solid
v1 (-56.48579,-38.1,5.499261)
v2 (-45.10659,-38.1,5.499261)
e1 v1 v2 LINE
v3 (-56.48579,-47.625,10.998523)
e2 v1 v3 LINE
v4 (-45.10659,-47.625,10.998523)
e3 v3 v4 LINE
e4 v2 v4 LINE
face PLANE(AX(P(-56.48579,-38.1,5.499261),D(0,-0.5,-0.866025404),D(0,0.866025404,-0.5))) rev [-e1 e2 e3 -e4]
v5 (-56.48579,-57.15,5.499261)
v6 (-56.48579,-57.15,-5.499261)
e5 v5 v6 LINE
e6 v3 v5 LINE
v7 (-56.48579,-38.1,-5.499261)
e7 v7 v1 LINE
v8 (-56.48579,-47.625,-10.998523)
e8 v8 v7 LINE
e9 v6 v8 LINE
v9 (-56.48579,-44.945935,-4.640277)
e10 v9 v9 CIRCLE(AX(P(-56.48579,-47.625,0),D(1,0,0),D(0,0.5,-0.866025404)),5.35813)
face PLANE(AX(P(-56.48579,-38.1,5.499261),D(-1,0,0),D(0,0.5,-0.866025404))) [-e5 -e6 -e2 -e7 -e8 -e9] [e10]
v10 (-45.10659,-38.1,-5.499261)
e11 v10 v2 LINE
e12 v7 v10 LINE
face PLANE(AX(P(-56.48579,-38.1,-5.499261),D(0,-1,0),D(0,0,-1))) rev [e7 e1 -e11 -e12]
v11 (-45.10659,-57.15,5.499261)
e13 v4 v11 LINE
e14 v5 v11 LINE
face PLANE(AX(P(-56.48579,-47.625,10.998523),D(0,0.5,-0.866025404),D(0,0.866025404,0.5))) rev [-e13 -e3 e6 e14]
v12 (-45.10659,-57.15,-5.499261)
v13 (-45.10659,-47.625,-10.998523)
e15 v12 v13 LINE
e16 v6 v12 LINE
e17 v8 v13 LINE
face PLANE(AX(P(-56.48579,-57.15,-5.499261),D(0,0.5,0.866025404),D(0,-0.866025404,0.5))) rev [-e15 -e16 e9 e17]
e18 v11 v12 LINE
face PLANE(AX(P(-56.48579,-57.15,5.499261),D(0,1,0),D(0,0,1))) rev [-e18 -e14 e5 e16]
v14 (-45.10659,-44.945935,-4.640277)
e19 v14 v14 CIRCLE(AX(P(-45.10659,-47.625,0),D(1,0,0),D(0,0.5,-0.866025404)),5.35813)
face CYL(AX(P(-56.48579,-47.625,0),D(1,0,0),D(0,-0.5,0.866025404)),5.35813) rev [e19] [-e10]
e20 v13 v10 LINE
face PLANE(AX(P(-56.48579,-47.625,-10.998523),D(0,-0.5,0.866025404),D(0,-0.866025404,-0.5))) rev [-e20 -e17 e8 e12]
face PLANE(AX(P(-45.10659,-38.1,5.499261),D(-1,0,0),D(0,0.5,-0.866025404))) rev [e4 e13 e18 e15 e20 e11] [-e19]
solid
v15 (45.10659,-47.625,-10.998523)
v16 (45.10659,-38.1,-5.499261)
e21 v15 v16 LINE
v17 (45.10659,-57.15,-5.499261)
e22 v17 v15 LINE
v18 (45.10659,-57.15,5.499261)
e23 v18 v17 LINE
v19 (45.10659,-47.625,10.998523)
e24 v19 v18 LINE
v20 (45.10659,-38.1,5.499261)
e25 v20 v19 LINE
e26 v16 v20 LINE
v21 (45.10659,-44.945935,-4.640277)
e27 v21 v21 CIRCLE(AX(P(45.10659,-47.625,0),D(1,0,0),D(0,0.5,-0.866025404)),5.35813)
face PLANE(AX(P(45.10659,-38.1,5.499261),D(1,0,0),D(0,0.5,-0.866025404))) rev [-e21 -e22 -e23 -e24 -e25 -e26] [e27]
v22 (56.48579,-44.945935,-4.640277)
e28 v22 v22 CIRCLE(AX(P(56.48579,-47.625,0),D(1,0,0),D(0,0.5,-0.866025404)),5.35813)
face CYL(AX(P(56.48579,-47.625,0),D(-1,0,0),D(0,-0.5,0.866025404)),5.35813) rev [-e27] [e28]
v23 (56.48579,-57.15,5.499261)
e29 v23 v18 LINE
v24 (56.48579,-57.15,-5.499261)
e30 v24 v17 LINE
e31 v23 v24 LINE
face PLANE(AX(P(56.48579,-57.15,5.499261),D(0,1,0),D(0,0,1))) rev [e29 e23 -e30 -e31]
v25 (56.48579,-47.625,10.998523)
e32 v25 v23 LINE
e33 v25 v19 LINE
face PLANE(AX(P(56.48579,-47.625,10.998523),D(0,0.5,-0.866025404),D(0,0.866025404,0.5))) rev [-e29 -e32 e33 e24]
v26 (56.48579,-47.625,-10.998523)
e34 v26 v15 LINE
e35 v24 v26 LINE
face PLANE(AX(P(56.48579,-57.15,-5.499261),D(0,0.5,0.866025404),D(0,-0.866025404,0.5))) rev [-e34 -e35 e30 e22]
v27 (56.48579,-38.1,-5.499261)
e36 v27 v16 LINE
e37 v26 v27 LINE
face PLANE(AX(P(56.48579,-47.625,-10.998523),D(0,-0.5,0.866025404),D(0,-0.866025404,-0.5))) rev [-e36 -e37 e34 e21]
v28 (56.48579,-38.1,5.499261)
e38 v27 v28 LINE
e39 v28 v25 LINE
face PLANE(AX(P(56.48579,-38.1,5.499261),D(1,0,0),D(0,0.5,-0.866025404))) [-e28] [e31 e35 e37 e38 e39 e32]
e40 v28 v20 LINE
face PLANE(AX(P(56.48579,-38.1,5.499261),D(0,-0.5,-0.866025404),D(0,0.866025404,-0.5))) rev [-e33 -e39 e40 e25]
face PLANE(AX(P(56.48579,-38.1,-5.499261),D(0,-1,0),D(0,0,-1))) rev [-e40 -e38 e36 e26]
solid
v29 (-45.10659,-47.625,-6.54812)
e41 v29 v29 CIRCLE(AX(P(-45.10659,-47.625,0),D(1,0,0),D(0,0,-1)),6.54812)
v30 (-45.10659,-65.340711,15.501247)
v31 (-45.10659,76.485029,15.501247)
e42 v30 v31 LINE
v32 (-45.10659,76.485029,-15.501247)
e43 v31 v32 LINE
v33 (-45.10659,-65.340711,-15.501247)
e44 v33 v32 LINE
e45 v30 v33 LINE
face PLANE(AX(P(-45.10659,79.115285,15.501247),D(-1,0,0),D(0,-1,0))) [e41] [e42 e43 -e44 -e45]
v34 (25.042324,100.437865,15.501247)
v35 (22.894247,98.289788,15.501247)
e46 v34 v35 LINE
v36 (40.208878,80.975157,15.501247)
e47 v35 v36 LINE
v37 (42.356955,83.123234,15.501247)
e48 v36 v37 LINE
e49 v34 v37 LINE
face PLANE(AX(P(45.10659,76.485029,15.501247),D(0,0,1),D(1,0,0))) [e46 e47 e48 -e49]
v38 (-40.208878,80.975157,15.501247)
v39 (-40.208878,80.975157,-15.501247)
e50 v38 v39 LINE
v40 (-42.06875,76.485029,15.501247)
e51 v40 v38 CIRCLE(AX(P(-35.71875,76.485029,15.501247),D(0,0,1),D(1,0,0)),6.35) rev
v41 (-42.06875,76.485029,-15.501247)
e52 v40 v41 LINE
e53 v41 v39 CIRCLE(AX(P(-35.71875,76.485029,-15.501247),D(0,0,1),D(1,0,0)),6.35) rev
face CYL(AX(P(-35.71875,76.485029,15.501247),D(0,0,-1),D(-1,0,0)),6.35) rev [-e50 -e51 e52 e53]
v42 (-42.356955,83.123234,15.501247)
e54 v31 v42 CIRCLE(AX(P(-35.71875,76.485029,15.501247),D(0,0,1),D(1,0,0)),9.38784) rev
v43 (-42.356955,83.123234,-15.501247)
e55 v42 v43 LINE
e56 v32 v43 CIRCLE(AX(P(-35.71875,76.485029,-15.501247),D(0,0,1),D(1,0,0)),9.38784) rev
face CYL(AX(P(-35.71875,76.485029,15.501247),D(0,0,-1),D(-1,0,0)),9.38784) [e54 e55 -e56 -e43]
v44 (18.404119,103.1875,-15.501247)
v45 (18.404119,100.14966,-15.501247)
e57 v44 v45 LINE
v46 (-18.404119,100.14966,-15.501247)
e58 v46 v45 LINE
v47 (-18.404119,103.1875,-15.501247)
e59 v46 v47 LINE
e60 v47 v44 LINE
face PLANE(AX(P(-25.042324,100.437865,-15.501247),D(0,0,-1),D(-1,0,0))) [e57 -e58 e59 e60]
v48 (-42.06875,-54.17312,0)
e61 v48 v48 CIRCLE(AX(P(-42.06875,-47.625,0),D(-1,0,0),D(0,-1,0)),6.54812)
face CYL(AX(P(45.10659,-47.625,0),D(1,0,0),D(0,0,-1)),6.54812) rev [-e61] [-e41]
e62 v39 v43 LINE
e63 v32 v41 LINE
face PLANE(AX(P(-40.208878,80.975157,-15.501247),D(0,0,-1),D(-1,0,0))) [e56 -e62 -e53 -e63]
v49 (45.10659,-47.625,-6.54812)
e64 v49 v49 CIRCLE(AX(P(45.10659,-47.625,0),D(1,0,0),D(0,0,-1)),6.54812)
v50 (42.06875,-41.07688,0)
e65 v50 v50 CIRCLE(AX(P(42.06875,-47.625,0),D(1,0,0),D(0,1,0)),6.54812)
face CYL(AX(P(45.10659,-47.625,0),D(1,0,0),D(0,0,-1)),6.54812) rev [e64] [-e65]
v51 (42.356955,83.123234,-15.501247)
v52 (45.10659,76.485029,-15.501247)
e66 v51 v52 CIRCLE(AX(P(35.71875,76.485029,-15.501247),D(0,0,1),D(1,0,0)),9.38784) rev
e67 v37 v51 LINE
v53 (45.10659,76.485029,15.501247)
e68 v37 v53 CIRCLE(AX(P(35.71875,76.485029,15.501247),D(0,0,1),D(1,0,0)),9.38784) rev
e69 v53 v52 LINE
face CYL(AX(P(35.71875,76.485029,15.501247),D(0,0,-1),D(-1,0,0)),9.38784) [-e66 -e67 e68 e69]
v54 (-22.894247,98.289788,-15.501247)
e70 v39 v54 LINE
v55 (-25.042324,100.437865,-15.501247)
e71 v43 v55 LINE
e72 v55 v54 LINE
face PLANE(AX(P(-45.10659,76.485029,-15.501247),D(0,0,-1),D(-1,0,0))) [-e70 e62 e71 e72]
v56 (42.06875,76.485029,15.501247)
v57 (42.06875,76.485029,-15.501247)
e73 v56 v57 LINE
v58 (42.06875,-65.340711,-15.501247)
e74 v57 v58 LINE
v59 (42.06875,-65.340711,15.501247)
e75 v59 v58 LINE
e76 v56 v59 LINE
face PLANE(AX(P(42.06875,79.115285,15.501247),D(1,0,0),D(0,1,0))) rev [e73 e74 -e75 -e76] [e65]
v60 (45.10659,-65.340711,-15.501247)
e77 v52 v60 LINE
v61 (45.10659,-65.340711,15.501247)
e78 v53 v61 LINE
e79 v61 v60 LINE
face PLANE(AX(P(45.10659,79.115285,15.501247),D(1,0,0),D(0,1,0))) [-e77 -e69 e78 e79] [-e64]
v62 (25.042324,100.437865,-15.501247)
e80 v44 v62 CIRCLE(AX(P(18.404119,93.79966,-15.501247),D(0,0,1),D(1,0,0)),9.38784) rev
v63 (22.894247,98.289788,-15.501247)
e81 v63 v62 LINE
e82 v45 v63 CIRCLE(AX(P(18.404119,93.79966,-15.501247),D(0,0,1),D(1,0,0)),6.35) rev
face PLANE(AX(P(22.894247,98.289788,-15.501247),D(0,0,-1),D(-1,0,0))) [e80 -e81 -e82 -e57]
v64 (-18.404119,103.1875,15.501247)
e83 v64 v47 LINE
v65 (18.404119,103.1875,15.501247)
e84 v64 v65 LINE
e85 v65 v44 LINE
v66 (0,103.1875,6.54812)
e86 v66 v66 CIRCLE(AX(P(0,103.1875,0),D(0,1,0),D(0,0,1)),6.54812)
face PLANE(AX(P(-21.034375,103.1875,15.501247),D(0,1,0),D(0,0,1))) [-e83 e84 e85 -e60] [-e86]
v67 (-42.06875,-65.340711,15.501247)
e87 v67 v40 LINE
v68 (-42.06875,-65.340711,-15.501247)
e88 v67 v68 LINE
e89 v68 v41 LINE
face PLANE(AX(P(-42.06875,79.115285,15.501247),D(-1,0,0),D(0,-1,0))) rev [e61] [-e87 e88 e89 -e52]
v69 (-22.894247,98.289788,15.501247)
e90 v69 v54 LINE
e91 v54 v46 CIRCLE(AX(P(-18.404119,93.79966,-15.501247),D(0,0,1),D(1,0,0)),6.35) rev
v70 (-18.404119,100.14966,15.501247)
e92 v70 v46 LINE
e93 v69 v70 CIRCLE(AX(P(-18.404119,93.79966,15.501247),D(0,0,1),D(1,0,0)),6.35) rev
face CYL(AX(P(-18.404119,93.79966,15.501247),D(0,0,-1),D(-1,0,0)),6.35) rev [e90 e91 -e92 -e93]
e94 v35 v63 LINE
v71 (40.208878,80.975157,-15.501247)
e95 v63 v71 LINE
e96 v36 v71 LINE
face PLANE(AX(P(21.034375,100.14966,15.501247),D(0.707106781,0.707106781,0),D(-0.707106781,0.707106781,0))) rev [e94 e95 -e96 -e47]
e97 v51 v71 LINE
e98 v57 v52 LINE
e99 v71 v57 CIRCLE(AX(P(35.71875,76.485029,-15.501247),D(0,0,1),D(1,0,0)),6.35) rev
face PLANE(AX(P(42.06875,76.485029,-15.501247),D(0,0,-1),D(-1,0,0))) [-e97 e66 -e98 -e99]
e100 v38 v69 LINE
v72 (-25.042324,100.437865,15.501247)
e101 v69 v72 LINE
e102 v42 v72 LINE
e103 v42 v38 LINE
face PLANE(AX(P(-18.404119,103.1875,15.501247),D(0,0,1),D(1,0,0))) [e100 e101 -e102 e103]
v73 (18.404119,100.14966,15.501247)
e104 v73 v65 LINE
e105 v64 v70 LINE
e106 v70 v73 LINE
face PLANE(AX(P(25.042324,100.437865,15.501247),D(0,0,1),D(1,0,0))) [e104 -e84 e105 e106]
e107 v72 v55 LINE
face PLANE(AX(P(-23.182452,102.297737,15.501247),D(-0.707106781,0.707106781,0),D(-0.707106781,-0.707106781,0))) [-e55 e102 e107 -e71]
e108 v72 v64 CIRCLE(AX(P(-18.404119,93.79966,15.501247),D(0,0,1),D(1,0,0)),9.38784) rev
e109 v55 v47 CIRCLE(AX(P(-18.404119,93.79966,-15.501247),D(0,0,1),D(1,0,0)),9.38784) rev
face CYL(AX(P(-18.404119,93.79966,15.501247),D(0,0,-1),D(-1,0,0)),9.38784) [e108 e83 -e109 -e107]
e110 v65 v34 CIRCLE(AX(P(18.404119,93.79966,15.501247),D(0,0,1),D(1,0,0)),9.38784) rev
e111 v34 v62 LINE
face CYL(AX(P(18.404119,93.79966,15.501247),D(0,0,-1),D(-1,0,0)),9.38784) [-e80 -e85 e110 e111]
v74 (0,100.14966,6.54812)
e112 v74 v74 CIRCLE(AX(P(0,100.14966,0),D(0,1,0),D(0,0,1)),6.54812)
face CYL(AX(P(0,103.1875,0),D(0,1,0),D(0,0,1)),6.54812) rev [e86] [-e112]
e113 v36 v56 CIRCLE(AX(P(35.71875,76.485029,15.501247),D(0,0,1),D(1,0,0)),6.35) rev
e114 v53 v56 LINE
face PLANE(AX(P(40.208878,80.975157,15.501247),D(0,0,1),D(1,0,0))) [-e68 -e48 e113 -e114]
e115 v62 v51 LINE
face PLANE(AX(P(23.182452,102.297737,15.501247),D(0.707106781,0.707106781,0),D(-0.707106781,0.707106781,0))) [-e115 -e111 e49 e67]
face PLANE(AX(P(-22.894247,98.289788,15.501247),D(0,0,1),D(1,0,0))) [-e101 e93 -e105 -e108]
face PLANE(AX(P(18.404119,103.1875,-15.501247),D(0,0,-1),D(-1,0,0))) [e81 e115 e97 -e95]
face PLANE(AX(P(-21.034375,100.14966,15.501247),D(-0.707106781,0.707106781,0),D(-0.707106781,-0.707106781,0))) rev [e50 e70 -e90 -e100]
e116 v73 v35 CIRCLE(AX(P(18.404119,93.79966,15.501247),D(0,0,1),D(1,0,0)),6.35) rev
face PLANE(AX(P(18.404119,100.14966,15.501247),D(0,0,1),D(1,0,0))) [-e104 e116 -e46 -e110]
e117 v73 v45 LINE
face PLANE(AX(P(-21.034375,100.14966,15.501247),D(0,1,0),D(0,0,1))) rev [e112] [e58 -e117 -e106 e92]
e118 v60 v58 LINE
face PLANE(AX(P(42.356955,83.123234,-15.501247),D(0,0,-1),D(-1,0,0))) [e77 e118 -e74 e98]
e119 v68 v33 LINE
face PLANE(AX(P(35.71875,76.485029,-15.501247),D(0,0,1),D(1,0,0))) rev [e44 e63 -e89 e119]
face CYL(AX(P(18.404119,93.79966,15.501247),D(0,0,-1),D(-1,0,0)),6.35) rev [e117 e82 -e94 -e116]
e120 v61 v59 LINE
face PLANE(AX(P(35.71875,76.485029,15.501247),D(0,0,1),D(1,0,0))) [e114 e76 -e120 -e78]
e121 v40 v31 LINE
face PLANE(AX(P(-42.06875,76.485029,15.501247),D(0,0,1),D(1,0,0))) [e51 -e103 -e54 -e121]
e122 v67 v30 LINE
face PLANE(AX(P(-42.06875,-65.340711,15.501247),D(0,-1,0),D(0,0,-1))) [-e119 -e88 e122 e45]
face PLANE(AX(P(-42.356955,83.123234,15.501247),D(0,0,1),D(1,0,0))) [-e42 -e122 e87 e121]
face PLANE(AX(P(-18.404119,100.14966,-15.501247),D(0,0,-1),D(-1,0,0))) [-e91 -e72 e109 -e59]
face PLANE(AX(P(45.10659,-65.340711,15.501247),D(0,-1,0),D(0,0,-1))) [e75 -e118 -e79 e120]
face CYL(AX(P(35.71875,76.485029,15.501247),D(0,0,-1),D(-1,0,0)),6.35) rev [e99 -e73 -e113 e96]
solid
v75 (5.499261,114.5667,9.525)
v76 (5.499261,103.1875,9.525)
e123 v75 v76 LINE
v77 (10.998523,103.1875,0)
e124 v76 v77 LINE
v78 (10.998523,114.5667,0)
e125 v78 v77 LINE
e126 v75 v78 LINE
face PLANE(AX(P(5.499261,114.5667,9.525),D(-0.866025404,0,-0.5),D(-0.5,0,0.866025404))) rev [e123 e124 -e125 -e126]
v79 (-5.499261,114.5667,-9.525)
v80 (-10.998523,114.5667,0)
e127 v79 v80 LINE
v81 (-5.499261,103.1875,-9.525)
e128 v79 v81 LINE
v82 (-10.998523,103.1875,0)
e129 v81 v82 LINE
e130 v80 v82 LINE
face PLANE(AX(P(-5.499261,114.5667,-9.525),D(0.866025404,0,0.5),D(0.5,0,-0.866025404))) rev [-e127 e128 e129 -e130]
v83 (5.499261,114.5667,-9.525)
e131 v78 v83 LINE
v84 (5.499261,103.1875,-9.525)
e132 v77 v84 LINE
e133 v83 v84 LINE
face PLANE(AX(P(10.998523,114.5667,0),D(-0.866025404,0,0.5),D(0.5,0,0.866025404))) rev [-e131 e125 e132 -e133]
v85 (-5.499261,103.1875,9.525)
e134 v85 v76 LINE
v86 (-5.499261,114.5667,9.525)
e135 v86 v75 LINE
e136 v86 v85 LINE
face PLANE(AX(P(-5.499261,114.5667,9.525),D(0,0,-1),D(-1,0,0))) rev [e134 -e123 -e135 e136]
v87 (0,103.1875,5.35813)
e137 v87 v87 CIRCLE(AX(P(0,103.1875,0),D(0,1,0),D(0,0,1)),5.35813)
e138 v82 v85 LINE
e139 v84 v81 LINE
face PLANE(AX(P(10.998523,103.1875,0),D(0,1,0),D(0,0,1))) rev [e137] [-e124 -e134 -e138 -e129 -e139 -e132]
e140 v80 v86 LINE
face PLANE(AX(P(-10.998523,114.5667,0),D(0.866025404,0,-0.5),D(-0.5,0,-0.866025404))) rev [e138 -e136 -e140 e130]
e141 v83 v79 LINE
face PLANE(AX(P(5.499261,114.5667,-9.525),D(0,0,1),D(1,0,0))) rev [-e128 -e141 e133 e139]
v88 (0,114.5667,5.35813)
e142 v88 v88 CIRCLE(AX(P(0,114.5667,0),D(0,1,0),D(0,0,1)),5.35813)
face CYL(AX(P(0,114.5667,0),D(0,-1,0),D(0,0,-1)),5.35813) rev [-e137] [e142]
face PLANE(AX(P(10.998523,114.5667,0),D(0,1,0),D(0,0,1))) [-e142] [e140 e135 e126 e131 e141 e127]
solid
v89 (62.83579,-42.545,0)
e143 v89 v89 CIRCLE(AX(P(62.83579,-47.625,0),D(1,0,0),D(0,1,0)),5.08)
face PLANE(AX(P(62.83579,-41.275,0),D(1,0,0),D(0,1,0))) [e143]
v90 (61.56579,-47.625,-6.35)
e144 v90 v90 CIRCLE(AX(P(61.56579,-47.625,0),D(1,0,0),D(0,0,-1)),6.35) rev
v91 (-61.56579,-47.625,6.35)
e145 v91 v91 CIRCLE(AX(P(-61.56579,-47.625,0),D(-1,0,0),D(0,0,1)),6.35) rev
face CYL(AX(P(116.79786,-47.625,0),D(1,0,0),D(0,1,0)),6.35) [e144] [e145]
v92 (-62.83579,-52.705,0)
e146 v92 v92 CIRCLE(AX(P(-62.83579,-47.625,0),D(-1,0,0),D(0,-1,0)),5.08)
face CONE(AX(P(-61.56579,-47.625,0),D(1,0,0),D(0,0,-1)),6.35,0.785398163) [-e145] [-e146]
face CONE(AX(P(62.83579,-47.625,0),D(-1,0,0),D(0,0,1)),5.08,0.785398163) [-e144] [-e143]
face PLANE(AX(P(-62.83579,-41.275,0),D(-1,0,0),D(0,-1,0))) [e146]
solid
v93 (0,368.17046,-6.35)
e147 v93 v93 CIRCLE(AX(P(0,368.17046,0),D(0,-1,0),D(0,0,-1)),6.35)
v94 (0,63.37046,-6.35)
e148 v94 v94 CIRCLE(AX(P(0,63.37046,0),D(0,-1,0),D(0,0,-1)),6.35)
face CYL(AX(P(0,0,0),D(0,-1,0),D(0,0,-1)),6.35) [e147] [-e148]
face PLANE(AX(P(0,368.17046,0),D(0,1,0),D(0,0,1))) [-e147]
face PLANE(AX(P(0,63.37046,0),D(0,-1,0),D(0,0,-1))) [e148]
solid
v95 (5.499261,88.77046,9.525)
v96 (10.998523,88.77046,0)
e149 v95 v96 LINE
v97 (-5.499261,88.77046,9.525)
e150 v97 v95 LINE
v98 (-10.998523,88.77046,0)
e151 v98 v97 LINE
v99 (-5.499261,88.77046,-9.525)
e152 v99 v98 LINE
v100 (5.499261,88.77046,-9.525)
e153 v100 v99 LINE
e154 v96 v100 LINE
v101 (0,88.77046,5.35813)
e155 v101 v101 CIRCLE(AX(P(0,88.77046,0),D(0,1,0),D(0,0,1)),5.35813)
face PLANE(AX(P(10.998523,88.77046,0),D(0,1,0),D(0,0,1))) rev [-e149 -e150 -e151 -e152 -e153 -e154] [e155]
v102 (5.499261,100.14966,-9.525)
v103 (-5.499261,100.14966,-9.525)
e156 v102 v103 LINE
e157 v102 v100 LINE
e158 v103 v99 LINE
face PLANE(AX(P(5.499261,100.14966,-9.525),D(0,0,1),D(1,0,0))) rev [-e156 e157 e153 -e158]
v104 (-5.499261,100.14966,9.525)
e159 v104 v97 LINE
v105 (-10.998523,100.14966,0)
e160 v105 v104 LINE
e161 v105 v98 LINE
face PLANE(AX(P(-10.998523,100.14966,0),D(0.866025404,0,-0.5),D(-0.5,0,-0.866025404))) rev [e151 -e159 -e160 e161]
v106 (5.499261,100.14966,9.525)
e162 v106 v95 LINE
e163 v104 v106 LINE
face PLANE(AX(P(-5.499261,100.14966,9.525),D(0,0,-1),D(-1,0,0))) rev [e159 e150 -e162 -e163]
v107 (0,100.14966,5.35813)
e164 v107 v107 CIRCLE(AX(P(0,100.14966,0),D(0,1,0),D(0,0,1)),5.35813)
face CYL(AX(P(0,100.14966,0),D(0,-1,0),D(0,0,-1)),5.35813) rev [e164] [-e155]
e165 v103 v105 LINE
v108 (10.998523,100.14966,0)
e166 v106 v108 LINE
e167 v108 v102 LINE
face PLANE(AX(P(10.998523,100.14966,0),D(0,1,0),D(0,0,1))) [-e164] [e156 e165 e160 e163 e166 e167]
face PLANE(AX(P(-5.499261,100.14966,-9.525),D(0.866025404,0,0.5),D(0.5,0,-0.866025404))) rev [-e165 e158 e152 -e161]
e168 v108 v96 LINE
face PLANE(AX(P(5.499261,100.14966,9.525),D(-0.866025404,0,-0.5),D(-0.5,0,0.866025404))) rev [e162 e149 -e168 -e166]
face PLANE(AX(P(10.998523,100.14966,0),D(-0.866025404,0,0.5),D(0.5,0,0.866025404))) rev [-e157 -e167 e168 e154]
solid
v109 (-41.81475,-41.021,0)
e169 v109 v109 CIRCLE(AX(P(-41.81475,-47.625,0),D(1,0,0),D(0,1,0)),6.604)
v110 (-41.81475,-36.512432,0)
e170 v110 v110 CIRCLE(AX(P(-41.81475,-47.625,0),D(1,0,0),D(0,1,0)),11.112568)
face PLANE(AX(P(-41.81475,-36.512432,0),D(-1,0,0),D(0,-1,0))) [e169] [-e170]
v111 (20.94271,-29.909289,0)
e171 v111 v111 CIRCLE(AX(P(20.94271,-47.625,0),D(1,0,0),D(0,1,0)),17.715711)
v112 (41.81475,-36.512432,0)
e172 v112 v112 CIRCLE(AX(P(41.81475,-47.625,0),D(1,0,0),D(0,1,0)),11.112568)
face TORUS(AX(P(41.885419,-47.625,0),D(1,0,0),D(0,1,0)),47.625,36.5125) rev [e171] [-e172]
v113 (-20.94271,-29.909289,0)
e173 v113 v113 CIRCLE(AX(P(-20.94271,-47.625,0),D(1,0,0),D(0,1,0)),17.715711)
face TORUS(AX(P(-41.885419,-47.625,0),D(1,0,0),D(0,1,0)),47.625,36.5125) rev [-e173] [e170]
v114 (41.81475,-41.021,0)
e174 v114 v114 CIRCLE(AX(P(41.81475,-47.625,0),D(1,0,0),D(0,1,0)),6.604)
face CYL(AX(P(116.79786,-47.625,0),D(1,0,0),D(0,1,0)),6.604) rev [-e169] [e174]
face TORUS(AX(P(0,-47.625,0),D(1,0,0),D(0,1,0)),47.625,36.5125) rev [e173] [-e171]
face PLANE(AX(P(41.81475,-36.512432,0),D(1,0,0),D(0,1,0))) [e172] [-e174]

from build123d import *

# Parameters (mm, degrees)
BASE_FLANGE1_DEPTH                = 15.50124711
F_1_2_CLEARANCE_HOLE2_D           = 13.09624
F_1_2_CLEARANCE_HOLE2_ON_FACE_2_D = 13.09624
NUT_SKETCH_R                      = 5.35813
NUT_DEPTH                         = 11.3792
BODY_MOVE_COPY3_ANGLE             = 158.9094188
ROLLER_SKETCH_W                   = 125.67158
ROLLER_SKETCH_H                   = 6.35
CHAMFER1_SIZE                     = 1.27
ROD_SKETCH_W                      = 6.35
ROD_SKETCH_H                      = 304.8


with BuildPart() as part:
    # Base-Flange1: sheet metal written as solids
    # Sketch1 → Base-Flange1 (new, symmetric)
    with BuildSketch(Plane.XY):
        with BuildLine():
            Line((-42.06875, -65.340710983), (-42.06875, 76.485028879))
            ThreePointArc((-42.06875, 76.485028879), (-41.585385031, 78.915068674), (-40.208878061, 80.975156939))
            Line((-40.208878061, 80.975156939), (-22.894246939, 98.289788061))
            ThreePointArc((-22.894246939, 98.289788061), (-20.834158674, 99.666295031), (-18.404118879, 100.14966))
            Line((-18.404118879, 100.14966), (18.404118879, 100.14966))
            ThreePointArc((18.404118879, 100.14966), (20.834158674, 99.666295031), (22.894246939, 98.289788061))
            Line((22.894246939, 98.289788061), (40.208878061, 80.975156939))
            ThreePointArc((40.208878061, 80.975156939), (41.585385031, 78.915068674), (42.06875, 76.485028879))
            Line((42.06875, 76.485028879), (42.06875, -65.340710983))
            Line((42.06875, -65.340710983), (45.10659, -65.340710983))
            Line((45.10659, -65.340710983), (45.10659, 76.485028879))
            ThreePointArc((45.10659, 76.485028879), (44.39198323, 80.077599713), (42.356955325, 83.123234204))
            Line((42.356955325, 83.123234204), (25.042324204, 100.437865325))
            ThreePointArc((25.042324204, 100.437865325), (21.996689713, 102.47289323), (18.404118879, 103.1875))
            Line((18.404118879, 103.1875), (-18.404118879, 103.1875))
            ThreePointArc((-18.404118879, 103.1875), (-21.996689713, 102.47289323), (-25.042324204, 100.437865325))
            Line((-25.042324204, 100.437865325), (-42.356955325, 83.123234204))
            ThreePointArc((-42.356955325, 83.123234204), (-44.39198323, 80.077599713), (-45.10659, 76.485028879))
            Line((-45.10659, 76.485028879), (-45.10659, -65.340710983))
            Line((-45.10659, -65.340710983), (-42.06875, -65.340710983))
        make_face()
    extrude(amount=BASE_FLANGE1_DEPTH, both=True)

    # 1/2 Clearance Hole2 (through all)
    with Locations(Plane.ZX.offset(103.1875)):
        with Locations((0, 0)):
            Hole(F_1_2_CLEARANCE_HOLE2_D / 2)

    # 1/2 Clearance Hole2 on face 2 (through all)
    with Locations(Plane(origin=(45.10659, -47.625, 0), x_dir=(0, 0, 1), z_dir=(1, 0, 0))):
        with Locations((0, 0)):
            Hole(F_1_2_CLEARANCE_HOLE2_ON_FACE_2_D / 2)


with BuildPart() as body_2:
    # Nut_Sketch → Nut (new body)
    with BuildSketch(Plane(origin=(0, 103.1875, 0), x_dir=(1, 0, 0), z_dir=(0, 1, 0))):
        Polygon((10.998522628, 0), (5.499261314, 9.525), (-5.499261314, 9.525), (-10.998522628, 0), (-5.499261314, -9.525), (5.499261314, -9.525), align=None)
        with Locations(Location((0, 0, 0), (0, 0, 270))):
            Circle(NUT_SKETCH_R, mode=Mode.SUBTRACT)
    extrude(amount=NUT_DEPTH)


with BuildPart() as body_3:
    # Body-Move/Copy1: read off the stored shape, not the designer's step
    # Body-Move/Copy1: copy of body 2
    add(body_2.part.moved(Location((0, -64.9213035, 0))))


with BuildPart() as body_4:
    # Body-Move_Copy1 2: copy of body 2
    add(body_2.part.moved(Location((0, -32.4606518, 0))))


with BuildPart() as body_4_1:
    # Body-Move/Copy2: read off the stored shape, not the designer's step
    # Body-Move/Copy2: moved
    add(body_4.part.moved(Location((0, 18.0436118, 0))))


with BuildPart() as body_3_1:
    # Body-Move/Copy3: read off the stored shape, not the designer's step
    # Body-Move/Copy3: moved
    add(body_3.part.moved(Location((-41.2444599, 6.8403935, -23.8125))).rotate(Axis((0, 0, 0), (-0.6947465906, -0.6947465906, -0.1861567879)), BODY_MOVE_COPY3_ANGLE))


with BuildPart() as body_5:
    # Roller_Sketch → Roller (revolve)
    with BuildSketch(Plane.XY):
        with Locations((0, -44.45)):
            Rectangle(ROLLER_SKETCH_W, ROLLER_SKETCH_H)
        with BuildLine():
            Line((41.81475, -36.51243161), (41.81475, -41.021))
            Line((41.81475, -41.021), (0, -41.021))
            Line((0, -41.021), (-41.81475, -41.021))
            Line((-41.81475, -41.021), (-41.81475, -36.51243161))
            ThreePointArc((-41.81475, -36.51243161), (-30.872204648, -34.811948524), (-20.942709632, -29.909289017))
            ThreePointArc((-20.942709632, -29.909289017), (0, -36.5125), (20.942709632, -29.909289017))
            ThreePointArc((20.942709632, -29.909289017), (30.872204648, -34.811948524), (41.81475, -36.51243161))
        make_face()
    revolve(axis=Axis((116.797860072, -47.625, 0), (-1, 0, 0)))

    # Chamfer1
    chamfer1_edges = [body_5.edges().sort_by_distance(p)[0] for p in [
        (-62.83579, -53.975, 0),
        (62.83579, -53.975, 0),
    ]]
    chamfer(chamfer1_edges, length=CHAMFER1_SIZE)


with BuildPart() as body_6:
    # Mirror1: mirrored copy
    add(body_3_1.part.mirror(Plane(origin=(0, 0, 0), x_dir=(0, 0, 1), z_dir=(1, 0, 0))))


with BuildPart() as body_7:
    # Rod_Sketch → Rod (revolve)
    with BuildSketch(Plane.XY, mode=Mode.PRIVATE) as rod_sk:
        with Locations((3.175, 215.77046)):
            Rectangle(ROD_SKETCH_W, ROD_SKETCH_H)
    revolve(rod_sk.sketch.rotate(Axis((0, 0, 0), (0, 1, 0)), 90), axis=Axis((0, 0, 0), (0, 1, 0)))


solid = Compound([part.part, body_2.part, body_4_1.part, body_3_1.part, body_5.part, body_6.part, body_7.part])
